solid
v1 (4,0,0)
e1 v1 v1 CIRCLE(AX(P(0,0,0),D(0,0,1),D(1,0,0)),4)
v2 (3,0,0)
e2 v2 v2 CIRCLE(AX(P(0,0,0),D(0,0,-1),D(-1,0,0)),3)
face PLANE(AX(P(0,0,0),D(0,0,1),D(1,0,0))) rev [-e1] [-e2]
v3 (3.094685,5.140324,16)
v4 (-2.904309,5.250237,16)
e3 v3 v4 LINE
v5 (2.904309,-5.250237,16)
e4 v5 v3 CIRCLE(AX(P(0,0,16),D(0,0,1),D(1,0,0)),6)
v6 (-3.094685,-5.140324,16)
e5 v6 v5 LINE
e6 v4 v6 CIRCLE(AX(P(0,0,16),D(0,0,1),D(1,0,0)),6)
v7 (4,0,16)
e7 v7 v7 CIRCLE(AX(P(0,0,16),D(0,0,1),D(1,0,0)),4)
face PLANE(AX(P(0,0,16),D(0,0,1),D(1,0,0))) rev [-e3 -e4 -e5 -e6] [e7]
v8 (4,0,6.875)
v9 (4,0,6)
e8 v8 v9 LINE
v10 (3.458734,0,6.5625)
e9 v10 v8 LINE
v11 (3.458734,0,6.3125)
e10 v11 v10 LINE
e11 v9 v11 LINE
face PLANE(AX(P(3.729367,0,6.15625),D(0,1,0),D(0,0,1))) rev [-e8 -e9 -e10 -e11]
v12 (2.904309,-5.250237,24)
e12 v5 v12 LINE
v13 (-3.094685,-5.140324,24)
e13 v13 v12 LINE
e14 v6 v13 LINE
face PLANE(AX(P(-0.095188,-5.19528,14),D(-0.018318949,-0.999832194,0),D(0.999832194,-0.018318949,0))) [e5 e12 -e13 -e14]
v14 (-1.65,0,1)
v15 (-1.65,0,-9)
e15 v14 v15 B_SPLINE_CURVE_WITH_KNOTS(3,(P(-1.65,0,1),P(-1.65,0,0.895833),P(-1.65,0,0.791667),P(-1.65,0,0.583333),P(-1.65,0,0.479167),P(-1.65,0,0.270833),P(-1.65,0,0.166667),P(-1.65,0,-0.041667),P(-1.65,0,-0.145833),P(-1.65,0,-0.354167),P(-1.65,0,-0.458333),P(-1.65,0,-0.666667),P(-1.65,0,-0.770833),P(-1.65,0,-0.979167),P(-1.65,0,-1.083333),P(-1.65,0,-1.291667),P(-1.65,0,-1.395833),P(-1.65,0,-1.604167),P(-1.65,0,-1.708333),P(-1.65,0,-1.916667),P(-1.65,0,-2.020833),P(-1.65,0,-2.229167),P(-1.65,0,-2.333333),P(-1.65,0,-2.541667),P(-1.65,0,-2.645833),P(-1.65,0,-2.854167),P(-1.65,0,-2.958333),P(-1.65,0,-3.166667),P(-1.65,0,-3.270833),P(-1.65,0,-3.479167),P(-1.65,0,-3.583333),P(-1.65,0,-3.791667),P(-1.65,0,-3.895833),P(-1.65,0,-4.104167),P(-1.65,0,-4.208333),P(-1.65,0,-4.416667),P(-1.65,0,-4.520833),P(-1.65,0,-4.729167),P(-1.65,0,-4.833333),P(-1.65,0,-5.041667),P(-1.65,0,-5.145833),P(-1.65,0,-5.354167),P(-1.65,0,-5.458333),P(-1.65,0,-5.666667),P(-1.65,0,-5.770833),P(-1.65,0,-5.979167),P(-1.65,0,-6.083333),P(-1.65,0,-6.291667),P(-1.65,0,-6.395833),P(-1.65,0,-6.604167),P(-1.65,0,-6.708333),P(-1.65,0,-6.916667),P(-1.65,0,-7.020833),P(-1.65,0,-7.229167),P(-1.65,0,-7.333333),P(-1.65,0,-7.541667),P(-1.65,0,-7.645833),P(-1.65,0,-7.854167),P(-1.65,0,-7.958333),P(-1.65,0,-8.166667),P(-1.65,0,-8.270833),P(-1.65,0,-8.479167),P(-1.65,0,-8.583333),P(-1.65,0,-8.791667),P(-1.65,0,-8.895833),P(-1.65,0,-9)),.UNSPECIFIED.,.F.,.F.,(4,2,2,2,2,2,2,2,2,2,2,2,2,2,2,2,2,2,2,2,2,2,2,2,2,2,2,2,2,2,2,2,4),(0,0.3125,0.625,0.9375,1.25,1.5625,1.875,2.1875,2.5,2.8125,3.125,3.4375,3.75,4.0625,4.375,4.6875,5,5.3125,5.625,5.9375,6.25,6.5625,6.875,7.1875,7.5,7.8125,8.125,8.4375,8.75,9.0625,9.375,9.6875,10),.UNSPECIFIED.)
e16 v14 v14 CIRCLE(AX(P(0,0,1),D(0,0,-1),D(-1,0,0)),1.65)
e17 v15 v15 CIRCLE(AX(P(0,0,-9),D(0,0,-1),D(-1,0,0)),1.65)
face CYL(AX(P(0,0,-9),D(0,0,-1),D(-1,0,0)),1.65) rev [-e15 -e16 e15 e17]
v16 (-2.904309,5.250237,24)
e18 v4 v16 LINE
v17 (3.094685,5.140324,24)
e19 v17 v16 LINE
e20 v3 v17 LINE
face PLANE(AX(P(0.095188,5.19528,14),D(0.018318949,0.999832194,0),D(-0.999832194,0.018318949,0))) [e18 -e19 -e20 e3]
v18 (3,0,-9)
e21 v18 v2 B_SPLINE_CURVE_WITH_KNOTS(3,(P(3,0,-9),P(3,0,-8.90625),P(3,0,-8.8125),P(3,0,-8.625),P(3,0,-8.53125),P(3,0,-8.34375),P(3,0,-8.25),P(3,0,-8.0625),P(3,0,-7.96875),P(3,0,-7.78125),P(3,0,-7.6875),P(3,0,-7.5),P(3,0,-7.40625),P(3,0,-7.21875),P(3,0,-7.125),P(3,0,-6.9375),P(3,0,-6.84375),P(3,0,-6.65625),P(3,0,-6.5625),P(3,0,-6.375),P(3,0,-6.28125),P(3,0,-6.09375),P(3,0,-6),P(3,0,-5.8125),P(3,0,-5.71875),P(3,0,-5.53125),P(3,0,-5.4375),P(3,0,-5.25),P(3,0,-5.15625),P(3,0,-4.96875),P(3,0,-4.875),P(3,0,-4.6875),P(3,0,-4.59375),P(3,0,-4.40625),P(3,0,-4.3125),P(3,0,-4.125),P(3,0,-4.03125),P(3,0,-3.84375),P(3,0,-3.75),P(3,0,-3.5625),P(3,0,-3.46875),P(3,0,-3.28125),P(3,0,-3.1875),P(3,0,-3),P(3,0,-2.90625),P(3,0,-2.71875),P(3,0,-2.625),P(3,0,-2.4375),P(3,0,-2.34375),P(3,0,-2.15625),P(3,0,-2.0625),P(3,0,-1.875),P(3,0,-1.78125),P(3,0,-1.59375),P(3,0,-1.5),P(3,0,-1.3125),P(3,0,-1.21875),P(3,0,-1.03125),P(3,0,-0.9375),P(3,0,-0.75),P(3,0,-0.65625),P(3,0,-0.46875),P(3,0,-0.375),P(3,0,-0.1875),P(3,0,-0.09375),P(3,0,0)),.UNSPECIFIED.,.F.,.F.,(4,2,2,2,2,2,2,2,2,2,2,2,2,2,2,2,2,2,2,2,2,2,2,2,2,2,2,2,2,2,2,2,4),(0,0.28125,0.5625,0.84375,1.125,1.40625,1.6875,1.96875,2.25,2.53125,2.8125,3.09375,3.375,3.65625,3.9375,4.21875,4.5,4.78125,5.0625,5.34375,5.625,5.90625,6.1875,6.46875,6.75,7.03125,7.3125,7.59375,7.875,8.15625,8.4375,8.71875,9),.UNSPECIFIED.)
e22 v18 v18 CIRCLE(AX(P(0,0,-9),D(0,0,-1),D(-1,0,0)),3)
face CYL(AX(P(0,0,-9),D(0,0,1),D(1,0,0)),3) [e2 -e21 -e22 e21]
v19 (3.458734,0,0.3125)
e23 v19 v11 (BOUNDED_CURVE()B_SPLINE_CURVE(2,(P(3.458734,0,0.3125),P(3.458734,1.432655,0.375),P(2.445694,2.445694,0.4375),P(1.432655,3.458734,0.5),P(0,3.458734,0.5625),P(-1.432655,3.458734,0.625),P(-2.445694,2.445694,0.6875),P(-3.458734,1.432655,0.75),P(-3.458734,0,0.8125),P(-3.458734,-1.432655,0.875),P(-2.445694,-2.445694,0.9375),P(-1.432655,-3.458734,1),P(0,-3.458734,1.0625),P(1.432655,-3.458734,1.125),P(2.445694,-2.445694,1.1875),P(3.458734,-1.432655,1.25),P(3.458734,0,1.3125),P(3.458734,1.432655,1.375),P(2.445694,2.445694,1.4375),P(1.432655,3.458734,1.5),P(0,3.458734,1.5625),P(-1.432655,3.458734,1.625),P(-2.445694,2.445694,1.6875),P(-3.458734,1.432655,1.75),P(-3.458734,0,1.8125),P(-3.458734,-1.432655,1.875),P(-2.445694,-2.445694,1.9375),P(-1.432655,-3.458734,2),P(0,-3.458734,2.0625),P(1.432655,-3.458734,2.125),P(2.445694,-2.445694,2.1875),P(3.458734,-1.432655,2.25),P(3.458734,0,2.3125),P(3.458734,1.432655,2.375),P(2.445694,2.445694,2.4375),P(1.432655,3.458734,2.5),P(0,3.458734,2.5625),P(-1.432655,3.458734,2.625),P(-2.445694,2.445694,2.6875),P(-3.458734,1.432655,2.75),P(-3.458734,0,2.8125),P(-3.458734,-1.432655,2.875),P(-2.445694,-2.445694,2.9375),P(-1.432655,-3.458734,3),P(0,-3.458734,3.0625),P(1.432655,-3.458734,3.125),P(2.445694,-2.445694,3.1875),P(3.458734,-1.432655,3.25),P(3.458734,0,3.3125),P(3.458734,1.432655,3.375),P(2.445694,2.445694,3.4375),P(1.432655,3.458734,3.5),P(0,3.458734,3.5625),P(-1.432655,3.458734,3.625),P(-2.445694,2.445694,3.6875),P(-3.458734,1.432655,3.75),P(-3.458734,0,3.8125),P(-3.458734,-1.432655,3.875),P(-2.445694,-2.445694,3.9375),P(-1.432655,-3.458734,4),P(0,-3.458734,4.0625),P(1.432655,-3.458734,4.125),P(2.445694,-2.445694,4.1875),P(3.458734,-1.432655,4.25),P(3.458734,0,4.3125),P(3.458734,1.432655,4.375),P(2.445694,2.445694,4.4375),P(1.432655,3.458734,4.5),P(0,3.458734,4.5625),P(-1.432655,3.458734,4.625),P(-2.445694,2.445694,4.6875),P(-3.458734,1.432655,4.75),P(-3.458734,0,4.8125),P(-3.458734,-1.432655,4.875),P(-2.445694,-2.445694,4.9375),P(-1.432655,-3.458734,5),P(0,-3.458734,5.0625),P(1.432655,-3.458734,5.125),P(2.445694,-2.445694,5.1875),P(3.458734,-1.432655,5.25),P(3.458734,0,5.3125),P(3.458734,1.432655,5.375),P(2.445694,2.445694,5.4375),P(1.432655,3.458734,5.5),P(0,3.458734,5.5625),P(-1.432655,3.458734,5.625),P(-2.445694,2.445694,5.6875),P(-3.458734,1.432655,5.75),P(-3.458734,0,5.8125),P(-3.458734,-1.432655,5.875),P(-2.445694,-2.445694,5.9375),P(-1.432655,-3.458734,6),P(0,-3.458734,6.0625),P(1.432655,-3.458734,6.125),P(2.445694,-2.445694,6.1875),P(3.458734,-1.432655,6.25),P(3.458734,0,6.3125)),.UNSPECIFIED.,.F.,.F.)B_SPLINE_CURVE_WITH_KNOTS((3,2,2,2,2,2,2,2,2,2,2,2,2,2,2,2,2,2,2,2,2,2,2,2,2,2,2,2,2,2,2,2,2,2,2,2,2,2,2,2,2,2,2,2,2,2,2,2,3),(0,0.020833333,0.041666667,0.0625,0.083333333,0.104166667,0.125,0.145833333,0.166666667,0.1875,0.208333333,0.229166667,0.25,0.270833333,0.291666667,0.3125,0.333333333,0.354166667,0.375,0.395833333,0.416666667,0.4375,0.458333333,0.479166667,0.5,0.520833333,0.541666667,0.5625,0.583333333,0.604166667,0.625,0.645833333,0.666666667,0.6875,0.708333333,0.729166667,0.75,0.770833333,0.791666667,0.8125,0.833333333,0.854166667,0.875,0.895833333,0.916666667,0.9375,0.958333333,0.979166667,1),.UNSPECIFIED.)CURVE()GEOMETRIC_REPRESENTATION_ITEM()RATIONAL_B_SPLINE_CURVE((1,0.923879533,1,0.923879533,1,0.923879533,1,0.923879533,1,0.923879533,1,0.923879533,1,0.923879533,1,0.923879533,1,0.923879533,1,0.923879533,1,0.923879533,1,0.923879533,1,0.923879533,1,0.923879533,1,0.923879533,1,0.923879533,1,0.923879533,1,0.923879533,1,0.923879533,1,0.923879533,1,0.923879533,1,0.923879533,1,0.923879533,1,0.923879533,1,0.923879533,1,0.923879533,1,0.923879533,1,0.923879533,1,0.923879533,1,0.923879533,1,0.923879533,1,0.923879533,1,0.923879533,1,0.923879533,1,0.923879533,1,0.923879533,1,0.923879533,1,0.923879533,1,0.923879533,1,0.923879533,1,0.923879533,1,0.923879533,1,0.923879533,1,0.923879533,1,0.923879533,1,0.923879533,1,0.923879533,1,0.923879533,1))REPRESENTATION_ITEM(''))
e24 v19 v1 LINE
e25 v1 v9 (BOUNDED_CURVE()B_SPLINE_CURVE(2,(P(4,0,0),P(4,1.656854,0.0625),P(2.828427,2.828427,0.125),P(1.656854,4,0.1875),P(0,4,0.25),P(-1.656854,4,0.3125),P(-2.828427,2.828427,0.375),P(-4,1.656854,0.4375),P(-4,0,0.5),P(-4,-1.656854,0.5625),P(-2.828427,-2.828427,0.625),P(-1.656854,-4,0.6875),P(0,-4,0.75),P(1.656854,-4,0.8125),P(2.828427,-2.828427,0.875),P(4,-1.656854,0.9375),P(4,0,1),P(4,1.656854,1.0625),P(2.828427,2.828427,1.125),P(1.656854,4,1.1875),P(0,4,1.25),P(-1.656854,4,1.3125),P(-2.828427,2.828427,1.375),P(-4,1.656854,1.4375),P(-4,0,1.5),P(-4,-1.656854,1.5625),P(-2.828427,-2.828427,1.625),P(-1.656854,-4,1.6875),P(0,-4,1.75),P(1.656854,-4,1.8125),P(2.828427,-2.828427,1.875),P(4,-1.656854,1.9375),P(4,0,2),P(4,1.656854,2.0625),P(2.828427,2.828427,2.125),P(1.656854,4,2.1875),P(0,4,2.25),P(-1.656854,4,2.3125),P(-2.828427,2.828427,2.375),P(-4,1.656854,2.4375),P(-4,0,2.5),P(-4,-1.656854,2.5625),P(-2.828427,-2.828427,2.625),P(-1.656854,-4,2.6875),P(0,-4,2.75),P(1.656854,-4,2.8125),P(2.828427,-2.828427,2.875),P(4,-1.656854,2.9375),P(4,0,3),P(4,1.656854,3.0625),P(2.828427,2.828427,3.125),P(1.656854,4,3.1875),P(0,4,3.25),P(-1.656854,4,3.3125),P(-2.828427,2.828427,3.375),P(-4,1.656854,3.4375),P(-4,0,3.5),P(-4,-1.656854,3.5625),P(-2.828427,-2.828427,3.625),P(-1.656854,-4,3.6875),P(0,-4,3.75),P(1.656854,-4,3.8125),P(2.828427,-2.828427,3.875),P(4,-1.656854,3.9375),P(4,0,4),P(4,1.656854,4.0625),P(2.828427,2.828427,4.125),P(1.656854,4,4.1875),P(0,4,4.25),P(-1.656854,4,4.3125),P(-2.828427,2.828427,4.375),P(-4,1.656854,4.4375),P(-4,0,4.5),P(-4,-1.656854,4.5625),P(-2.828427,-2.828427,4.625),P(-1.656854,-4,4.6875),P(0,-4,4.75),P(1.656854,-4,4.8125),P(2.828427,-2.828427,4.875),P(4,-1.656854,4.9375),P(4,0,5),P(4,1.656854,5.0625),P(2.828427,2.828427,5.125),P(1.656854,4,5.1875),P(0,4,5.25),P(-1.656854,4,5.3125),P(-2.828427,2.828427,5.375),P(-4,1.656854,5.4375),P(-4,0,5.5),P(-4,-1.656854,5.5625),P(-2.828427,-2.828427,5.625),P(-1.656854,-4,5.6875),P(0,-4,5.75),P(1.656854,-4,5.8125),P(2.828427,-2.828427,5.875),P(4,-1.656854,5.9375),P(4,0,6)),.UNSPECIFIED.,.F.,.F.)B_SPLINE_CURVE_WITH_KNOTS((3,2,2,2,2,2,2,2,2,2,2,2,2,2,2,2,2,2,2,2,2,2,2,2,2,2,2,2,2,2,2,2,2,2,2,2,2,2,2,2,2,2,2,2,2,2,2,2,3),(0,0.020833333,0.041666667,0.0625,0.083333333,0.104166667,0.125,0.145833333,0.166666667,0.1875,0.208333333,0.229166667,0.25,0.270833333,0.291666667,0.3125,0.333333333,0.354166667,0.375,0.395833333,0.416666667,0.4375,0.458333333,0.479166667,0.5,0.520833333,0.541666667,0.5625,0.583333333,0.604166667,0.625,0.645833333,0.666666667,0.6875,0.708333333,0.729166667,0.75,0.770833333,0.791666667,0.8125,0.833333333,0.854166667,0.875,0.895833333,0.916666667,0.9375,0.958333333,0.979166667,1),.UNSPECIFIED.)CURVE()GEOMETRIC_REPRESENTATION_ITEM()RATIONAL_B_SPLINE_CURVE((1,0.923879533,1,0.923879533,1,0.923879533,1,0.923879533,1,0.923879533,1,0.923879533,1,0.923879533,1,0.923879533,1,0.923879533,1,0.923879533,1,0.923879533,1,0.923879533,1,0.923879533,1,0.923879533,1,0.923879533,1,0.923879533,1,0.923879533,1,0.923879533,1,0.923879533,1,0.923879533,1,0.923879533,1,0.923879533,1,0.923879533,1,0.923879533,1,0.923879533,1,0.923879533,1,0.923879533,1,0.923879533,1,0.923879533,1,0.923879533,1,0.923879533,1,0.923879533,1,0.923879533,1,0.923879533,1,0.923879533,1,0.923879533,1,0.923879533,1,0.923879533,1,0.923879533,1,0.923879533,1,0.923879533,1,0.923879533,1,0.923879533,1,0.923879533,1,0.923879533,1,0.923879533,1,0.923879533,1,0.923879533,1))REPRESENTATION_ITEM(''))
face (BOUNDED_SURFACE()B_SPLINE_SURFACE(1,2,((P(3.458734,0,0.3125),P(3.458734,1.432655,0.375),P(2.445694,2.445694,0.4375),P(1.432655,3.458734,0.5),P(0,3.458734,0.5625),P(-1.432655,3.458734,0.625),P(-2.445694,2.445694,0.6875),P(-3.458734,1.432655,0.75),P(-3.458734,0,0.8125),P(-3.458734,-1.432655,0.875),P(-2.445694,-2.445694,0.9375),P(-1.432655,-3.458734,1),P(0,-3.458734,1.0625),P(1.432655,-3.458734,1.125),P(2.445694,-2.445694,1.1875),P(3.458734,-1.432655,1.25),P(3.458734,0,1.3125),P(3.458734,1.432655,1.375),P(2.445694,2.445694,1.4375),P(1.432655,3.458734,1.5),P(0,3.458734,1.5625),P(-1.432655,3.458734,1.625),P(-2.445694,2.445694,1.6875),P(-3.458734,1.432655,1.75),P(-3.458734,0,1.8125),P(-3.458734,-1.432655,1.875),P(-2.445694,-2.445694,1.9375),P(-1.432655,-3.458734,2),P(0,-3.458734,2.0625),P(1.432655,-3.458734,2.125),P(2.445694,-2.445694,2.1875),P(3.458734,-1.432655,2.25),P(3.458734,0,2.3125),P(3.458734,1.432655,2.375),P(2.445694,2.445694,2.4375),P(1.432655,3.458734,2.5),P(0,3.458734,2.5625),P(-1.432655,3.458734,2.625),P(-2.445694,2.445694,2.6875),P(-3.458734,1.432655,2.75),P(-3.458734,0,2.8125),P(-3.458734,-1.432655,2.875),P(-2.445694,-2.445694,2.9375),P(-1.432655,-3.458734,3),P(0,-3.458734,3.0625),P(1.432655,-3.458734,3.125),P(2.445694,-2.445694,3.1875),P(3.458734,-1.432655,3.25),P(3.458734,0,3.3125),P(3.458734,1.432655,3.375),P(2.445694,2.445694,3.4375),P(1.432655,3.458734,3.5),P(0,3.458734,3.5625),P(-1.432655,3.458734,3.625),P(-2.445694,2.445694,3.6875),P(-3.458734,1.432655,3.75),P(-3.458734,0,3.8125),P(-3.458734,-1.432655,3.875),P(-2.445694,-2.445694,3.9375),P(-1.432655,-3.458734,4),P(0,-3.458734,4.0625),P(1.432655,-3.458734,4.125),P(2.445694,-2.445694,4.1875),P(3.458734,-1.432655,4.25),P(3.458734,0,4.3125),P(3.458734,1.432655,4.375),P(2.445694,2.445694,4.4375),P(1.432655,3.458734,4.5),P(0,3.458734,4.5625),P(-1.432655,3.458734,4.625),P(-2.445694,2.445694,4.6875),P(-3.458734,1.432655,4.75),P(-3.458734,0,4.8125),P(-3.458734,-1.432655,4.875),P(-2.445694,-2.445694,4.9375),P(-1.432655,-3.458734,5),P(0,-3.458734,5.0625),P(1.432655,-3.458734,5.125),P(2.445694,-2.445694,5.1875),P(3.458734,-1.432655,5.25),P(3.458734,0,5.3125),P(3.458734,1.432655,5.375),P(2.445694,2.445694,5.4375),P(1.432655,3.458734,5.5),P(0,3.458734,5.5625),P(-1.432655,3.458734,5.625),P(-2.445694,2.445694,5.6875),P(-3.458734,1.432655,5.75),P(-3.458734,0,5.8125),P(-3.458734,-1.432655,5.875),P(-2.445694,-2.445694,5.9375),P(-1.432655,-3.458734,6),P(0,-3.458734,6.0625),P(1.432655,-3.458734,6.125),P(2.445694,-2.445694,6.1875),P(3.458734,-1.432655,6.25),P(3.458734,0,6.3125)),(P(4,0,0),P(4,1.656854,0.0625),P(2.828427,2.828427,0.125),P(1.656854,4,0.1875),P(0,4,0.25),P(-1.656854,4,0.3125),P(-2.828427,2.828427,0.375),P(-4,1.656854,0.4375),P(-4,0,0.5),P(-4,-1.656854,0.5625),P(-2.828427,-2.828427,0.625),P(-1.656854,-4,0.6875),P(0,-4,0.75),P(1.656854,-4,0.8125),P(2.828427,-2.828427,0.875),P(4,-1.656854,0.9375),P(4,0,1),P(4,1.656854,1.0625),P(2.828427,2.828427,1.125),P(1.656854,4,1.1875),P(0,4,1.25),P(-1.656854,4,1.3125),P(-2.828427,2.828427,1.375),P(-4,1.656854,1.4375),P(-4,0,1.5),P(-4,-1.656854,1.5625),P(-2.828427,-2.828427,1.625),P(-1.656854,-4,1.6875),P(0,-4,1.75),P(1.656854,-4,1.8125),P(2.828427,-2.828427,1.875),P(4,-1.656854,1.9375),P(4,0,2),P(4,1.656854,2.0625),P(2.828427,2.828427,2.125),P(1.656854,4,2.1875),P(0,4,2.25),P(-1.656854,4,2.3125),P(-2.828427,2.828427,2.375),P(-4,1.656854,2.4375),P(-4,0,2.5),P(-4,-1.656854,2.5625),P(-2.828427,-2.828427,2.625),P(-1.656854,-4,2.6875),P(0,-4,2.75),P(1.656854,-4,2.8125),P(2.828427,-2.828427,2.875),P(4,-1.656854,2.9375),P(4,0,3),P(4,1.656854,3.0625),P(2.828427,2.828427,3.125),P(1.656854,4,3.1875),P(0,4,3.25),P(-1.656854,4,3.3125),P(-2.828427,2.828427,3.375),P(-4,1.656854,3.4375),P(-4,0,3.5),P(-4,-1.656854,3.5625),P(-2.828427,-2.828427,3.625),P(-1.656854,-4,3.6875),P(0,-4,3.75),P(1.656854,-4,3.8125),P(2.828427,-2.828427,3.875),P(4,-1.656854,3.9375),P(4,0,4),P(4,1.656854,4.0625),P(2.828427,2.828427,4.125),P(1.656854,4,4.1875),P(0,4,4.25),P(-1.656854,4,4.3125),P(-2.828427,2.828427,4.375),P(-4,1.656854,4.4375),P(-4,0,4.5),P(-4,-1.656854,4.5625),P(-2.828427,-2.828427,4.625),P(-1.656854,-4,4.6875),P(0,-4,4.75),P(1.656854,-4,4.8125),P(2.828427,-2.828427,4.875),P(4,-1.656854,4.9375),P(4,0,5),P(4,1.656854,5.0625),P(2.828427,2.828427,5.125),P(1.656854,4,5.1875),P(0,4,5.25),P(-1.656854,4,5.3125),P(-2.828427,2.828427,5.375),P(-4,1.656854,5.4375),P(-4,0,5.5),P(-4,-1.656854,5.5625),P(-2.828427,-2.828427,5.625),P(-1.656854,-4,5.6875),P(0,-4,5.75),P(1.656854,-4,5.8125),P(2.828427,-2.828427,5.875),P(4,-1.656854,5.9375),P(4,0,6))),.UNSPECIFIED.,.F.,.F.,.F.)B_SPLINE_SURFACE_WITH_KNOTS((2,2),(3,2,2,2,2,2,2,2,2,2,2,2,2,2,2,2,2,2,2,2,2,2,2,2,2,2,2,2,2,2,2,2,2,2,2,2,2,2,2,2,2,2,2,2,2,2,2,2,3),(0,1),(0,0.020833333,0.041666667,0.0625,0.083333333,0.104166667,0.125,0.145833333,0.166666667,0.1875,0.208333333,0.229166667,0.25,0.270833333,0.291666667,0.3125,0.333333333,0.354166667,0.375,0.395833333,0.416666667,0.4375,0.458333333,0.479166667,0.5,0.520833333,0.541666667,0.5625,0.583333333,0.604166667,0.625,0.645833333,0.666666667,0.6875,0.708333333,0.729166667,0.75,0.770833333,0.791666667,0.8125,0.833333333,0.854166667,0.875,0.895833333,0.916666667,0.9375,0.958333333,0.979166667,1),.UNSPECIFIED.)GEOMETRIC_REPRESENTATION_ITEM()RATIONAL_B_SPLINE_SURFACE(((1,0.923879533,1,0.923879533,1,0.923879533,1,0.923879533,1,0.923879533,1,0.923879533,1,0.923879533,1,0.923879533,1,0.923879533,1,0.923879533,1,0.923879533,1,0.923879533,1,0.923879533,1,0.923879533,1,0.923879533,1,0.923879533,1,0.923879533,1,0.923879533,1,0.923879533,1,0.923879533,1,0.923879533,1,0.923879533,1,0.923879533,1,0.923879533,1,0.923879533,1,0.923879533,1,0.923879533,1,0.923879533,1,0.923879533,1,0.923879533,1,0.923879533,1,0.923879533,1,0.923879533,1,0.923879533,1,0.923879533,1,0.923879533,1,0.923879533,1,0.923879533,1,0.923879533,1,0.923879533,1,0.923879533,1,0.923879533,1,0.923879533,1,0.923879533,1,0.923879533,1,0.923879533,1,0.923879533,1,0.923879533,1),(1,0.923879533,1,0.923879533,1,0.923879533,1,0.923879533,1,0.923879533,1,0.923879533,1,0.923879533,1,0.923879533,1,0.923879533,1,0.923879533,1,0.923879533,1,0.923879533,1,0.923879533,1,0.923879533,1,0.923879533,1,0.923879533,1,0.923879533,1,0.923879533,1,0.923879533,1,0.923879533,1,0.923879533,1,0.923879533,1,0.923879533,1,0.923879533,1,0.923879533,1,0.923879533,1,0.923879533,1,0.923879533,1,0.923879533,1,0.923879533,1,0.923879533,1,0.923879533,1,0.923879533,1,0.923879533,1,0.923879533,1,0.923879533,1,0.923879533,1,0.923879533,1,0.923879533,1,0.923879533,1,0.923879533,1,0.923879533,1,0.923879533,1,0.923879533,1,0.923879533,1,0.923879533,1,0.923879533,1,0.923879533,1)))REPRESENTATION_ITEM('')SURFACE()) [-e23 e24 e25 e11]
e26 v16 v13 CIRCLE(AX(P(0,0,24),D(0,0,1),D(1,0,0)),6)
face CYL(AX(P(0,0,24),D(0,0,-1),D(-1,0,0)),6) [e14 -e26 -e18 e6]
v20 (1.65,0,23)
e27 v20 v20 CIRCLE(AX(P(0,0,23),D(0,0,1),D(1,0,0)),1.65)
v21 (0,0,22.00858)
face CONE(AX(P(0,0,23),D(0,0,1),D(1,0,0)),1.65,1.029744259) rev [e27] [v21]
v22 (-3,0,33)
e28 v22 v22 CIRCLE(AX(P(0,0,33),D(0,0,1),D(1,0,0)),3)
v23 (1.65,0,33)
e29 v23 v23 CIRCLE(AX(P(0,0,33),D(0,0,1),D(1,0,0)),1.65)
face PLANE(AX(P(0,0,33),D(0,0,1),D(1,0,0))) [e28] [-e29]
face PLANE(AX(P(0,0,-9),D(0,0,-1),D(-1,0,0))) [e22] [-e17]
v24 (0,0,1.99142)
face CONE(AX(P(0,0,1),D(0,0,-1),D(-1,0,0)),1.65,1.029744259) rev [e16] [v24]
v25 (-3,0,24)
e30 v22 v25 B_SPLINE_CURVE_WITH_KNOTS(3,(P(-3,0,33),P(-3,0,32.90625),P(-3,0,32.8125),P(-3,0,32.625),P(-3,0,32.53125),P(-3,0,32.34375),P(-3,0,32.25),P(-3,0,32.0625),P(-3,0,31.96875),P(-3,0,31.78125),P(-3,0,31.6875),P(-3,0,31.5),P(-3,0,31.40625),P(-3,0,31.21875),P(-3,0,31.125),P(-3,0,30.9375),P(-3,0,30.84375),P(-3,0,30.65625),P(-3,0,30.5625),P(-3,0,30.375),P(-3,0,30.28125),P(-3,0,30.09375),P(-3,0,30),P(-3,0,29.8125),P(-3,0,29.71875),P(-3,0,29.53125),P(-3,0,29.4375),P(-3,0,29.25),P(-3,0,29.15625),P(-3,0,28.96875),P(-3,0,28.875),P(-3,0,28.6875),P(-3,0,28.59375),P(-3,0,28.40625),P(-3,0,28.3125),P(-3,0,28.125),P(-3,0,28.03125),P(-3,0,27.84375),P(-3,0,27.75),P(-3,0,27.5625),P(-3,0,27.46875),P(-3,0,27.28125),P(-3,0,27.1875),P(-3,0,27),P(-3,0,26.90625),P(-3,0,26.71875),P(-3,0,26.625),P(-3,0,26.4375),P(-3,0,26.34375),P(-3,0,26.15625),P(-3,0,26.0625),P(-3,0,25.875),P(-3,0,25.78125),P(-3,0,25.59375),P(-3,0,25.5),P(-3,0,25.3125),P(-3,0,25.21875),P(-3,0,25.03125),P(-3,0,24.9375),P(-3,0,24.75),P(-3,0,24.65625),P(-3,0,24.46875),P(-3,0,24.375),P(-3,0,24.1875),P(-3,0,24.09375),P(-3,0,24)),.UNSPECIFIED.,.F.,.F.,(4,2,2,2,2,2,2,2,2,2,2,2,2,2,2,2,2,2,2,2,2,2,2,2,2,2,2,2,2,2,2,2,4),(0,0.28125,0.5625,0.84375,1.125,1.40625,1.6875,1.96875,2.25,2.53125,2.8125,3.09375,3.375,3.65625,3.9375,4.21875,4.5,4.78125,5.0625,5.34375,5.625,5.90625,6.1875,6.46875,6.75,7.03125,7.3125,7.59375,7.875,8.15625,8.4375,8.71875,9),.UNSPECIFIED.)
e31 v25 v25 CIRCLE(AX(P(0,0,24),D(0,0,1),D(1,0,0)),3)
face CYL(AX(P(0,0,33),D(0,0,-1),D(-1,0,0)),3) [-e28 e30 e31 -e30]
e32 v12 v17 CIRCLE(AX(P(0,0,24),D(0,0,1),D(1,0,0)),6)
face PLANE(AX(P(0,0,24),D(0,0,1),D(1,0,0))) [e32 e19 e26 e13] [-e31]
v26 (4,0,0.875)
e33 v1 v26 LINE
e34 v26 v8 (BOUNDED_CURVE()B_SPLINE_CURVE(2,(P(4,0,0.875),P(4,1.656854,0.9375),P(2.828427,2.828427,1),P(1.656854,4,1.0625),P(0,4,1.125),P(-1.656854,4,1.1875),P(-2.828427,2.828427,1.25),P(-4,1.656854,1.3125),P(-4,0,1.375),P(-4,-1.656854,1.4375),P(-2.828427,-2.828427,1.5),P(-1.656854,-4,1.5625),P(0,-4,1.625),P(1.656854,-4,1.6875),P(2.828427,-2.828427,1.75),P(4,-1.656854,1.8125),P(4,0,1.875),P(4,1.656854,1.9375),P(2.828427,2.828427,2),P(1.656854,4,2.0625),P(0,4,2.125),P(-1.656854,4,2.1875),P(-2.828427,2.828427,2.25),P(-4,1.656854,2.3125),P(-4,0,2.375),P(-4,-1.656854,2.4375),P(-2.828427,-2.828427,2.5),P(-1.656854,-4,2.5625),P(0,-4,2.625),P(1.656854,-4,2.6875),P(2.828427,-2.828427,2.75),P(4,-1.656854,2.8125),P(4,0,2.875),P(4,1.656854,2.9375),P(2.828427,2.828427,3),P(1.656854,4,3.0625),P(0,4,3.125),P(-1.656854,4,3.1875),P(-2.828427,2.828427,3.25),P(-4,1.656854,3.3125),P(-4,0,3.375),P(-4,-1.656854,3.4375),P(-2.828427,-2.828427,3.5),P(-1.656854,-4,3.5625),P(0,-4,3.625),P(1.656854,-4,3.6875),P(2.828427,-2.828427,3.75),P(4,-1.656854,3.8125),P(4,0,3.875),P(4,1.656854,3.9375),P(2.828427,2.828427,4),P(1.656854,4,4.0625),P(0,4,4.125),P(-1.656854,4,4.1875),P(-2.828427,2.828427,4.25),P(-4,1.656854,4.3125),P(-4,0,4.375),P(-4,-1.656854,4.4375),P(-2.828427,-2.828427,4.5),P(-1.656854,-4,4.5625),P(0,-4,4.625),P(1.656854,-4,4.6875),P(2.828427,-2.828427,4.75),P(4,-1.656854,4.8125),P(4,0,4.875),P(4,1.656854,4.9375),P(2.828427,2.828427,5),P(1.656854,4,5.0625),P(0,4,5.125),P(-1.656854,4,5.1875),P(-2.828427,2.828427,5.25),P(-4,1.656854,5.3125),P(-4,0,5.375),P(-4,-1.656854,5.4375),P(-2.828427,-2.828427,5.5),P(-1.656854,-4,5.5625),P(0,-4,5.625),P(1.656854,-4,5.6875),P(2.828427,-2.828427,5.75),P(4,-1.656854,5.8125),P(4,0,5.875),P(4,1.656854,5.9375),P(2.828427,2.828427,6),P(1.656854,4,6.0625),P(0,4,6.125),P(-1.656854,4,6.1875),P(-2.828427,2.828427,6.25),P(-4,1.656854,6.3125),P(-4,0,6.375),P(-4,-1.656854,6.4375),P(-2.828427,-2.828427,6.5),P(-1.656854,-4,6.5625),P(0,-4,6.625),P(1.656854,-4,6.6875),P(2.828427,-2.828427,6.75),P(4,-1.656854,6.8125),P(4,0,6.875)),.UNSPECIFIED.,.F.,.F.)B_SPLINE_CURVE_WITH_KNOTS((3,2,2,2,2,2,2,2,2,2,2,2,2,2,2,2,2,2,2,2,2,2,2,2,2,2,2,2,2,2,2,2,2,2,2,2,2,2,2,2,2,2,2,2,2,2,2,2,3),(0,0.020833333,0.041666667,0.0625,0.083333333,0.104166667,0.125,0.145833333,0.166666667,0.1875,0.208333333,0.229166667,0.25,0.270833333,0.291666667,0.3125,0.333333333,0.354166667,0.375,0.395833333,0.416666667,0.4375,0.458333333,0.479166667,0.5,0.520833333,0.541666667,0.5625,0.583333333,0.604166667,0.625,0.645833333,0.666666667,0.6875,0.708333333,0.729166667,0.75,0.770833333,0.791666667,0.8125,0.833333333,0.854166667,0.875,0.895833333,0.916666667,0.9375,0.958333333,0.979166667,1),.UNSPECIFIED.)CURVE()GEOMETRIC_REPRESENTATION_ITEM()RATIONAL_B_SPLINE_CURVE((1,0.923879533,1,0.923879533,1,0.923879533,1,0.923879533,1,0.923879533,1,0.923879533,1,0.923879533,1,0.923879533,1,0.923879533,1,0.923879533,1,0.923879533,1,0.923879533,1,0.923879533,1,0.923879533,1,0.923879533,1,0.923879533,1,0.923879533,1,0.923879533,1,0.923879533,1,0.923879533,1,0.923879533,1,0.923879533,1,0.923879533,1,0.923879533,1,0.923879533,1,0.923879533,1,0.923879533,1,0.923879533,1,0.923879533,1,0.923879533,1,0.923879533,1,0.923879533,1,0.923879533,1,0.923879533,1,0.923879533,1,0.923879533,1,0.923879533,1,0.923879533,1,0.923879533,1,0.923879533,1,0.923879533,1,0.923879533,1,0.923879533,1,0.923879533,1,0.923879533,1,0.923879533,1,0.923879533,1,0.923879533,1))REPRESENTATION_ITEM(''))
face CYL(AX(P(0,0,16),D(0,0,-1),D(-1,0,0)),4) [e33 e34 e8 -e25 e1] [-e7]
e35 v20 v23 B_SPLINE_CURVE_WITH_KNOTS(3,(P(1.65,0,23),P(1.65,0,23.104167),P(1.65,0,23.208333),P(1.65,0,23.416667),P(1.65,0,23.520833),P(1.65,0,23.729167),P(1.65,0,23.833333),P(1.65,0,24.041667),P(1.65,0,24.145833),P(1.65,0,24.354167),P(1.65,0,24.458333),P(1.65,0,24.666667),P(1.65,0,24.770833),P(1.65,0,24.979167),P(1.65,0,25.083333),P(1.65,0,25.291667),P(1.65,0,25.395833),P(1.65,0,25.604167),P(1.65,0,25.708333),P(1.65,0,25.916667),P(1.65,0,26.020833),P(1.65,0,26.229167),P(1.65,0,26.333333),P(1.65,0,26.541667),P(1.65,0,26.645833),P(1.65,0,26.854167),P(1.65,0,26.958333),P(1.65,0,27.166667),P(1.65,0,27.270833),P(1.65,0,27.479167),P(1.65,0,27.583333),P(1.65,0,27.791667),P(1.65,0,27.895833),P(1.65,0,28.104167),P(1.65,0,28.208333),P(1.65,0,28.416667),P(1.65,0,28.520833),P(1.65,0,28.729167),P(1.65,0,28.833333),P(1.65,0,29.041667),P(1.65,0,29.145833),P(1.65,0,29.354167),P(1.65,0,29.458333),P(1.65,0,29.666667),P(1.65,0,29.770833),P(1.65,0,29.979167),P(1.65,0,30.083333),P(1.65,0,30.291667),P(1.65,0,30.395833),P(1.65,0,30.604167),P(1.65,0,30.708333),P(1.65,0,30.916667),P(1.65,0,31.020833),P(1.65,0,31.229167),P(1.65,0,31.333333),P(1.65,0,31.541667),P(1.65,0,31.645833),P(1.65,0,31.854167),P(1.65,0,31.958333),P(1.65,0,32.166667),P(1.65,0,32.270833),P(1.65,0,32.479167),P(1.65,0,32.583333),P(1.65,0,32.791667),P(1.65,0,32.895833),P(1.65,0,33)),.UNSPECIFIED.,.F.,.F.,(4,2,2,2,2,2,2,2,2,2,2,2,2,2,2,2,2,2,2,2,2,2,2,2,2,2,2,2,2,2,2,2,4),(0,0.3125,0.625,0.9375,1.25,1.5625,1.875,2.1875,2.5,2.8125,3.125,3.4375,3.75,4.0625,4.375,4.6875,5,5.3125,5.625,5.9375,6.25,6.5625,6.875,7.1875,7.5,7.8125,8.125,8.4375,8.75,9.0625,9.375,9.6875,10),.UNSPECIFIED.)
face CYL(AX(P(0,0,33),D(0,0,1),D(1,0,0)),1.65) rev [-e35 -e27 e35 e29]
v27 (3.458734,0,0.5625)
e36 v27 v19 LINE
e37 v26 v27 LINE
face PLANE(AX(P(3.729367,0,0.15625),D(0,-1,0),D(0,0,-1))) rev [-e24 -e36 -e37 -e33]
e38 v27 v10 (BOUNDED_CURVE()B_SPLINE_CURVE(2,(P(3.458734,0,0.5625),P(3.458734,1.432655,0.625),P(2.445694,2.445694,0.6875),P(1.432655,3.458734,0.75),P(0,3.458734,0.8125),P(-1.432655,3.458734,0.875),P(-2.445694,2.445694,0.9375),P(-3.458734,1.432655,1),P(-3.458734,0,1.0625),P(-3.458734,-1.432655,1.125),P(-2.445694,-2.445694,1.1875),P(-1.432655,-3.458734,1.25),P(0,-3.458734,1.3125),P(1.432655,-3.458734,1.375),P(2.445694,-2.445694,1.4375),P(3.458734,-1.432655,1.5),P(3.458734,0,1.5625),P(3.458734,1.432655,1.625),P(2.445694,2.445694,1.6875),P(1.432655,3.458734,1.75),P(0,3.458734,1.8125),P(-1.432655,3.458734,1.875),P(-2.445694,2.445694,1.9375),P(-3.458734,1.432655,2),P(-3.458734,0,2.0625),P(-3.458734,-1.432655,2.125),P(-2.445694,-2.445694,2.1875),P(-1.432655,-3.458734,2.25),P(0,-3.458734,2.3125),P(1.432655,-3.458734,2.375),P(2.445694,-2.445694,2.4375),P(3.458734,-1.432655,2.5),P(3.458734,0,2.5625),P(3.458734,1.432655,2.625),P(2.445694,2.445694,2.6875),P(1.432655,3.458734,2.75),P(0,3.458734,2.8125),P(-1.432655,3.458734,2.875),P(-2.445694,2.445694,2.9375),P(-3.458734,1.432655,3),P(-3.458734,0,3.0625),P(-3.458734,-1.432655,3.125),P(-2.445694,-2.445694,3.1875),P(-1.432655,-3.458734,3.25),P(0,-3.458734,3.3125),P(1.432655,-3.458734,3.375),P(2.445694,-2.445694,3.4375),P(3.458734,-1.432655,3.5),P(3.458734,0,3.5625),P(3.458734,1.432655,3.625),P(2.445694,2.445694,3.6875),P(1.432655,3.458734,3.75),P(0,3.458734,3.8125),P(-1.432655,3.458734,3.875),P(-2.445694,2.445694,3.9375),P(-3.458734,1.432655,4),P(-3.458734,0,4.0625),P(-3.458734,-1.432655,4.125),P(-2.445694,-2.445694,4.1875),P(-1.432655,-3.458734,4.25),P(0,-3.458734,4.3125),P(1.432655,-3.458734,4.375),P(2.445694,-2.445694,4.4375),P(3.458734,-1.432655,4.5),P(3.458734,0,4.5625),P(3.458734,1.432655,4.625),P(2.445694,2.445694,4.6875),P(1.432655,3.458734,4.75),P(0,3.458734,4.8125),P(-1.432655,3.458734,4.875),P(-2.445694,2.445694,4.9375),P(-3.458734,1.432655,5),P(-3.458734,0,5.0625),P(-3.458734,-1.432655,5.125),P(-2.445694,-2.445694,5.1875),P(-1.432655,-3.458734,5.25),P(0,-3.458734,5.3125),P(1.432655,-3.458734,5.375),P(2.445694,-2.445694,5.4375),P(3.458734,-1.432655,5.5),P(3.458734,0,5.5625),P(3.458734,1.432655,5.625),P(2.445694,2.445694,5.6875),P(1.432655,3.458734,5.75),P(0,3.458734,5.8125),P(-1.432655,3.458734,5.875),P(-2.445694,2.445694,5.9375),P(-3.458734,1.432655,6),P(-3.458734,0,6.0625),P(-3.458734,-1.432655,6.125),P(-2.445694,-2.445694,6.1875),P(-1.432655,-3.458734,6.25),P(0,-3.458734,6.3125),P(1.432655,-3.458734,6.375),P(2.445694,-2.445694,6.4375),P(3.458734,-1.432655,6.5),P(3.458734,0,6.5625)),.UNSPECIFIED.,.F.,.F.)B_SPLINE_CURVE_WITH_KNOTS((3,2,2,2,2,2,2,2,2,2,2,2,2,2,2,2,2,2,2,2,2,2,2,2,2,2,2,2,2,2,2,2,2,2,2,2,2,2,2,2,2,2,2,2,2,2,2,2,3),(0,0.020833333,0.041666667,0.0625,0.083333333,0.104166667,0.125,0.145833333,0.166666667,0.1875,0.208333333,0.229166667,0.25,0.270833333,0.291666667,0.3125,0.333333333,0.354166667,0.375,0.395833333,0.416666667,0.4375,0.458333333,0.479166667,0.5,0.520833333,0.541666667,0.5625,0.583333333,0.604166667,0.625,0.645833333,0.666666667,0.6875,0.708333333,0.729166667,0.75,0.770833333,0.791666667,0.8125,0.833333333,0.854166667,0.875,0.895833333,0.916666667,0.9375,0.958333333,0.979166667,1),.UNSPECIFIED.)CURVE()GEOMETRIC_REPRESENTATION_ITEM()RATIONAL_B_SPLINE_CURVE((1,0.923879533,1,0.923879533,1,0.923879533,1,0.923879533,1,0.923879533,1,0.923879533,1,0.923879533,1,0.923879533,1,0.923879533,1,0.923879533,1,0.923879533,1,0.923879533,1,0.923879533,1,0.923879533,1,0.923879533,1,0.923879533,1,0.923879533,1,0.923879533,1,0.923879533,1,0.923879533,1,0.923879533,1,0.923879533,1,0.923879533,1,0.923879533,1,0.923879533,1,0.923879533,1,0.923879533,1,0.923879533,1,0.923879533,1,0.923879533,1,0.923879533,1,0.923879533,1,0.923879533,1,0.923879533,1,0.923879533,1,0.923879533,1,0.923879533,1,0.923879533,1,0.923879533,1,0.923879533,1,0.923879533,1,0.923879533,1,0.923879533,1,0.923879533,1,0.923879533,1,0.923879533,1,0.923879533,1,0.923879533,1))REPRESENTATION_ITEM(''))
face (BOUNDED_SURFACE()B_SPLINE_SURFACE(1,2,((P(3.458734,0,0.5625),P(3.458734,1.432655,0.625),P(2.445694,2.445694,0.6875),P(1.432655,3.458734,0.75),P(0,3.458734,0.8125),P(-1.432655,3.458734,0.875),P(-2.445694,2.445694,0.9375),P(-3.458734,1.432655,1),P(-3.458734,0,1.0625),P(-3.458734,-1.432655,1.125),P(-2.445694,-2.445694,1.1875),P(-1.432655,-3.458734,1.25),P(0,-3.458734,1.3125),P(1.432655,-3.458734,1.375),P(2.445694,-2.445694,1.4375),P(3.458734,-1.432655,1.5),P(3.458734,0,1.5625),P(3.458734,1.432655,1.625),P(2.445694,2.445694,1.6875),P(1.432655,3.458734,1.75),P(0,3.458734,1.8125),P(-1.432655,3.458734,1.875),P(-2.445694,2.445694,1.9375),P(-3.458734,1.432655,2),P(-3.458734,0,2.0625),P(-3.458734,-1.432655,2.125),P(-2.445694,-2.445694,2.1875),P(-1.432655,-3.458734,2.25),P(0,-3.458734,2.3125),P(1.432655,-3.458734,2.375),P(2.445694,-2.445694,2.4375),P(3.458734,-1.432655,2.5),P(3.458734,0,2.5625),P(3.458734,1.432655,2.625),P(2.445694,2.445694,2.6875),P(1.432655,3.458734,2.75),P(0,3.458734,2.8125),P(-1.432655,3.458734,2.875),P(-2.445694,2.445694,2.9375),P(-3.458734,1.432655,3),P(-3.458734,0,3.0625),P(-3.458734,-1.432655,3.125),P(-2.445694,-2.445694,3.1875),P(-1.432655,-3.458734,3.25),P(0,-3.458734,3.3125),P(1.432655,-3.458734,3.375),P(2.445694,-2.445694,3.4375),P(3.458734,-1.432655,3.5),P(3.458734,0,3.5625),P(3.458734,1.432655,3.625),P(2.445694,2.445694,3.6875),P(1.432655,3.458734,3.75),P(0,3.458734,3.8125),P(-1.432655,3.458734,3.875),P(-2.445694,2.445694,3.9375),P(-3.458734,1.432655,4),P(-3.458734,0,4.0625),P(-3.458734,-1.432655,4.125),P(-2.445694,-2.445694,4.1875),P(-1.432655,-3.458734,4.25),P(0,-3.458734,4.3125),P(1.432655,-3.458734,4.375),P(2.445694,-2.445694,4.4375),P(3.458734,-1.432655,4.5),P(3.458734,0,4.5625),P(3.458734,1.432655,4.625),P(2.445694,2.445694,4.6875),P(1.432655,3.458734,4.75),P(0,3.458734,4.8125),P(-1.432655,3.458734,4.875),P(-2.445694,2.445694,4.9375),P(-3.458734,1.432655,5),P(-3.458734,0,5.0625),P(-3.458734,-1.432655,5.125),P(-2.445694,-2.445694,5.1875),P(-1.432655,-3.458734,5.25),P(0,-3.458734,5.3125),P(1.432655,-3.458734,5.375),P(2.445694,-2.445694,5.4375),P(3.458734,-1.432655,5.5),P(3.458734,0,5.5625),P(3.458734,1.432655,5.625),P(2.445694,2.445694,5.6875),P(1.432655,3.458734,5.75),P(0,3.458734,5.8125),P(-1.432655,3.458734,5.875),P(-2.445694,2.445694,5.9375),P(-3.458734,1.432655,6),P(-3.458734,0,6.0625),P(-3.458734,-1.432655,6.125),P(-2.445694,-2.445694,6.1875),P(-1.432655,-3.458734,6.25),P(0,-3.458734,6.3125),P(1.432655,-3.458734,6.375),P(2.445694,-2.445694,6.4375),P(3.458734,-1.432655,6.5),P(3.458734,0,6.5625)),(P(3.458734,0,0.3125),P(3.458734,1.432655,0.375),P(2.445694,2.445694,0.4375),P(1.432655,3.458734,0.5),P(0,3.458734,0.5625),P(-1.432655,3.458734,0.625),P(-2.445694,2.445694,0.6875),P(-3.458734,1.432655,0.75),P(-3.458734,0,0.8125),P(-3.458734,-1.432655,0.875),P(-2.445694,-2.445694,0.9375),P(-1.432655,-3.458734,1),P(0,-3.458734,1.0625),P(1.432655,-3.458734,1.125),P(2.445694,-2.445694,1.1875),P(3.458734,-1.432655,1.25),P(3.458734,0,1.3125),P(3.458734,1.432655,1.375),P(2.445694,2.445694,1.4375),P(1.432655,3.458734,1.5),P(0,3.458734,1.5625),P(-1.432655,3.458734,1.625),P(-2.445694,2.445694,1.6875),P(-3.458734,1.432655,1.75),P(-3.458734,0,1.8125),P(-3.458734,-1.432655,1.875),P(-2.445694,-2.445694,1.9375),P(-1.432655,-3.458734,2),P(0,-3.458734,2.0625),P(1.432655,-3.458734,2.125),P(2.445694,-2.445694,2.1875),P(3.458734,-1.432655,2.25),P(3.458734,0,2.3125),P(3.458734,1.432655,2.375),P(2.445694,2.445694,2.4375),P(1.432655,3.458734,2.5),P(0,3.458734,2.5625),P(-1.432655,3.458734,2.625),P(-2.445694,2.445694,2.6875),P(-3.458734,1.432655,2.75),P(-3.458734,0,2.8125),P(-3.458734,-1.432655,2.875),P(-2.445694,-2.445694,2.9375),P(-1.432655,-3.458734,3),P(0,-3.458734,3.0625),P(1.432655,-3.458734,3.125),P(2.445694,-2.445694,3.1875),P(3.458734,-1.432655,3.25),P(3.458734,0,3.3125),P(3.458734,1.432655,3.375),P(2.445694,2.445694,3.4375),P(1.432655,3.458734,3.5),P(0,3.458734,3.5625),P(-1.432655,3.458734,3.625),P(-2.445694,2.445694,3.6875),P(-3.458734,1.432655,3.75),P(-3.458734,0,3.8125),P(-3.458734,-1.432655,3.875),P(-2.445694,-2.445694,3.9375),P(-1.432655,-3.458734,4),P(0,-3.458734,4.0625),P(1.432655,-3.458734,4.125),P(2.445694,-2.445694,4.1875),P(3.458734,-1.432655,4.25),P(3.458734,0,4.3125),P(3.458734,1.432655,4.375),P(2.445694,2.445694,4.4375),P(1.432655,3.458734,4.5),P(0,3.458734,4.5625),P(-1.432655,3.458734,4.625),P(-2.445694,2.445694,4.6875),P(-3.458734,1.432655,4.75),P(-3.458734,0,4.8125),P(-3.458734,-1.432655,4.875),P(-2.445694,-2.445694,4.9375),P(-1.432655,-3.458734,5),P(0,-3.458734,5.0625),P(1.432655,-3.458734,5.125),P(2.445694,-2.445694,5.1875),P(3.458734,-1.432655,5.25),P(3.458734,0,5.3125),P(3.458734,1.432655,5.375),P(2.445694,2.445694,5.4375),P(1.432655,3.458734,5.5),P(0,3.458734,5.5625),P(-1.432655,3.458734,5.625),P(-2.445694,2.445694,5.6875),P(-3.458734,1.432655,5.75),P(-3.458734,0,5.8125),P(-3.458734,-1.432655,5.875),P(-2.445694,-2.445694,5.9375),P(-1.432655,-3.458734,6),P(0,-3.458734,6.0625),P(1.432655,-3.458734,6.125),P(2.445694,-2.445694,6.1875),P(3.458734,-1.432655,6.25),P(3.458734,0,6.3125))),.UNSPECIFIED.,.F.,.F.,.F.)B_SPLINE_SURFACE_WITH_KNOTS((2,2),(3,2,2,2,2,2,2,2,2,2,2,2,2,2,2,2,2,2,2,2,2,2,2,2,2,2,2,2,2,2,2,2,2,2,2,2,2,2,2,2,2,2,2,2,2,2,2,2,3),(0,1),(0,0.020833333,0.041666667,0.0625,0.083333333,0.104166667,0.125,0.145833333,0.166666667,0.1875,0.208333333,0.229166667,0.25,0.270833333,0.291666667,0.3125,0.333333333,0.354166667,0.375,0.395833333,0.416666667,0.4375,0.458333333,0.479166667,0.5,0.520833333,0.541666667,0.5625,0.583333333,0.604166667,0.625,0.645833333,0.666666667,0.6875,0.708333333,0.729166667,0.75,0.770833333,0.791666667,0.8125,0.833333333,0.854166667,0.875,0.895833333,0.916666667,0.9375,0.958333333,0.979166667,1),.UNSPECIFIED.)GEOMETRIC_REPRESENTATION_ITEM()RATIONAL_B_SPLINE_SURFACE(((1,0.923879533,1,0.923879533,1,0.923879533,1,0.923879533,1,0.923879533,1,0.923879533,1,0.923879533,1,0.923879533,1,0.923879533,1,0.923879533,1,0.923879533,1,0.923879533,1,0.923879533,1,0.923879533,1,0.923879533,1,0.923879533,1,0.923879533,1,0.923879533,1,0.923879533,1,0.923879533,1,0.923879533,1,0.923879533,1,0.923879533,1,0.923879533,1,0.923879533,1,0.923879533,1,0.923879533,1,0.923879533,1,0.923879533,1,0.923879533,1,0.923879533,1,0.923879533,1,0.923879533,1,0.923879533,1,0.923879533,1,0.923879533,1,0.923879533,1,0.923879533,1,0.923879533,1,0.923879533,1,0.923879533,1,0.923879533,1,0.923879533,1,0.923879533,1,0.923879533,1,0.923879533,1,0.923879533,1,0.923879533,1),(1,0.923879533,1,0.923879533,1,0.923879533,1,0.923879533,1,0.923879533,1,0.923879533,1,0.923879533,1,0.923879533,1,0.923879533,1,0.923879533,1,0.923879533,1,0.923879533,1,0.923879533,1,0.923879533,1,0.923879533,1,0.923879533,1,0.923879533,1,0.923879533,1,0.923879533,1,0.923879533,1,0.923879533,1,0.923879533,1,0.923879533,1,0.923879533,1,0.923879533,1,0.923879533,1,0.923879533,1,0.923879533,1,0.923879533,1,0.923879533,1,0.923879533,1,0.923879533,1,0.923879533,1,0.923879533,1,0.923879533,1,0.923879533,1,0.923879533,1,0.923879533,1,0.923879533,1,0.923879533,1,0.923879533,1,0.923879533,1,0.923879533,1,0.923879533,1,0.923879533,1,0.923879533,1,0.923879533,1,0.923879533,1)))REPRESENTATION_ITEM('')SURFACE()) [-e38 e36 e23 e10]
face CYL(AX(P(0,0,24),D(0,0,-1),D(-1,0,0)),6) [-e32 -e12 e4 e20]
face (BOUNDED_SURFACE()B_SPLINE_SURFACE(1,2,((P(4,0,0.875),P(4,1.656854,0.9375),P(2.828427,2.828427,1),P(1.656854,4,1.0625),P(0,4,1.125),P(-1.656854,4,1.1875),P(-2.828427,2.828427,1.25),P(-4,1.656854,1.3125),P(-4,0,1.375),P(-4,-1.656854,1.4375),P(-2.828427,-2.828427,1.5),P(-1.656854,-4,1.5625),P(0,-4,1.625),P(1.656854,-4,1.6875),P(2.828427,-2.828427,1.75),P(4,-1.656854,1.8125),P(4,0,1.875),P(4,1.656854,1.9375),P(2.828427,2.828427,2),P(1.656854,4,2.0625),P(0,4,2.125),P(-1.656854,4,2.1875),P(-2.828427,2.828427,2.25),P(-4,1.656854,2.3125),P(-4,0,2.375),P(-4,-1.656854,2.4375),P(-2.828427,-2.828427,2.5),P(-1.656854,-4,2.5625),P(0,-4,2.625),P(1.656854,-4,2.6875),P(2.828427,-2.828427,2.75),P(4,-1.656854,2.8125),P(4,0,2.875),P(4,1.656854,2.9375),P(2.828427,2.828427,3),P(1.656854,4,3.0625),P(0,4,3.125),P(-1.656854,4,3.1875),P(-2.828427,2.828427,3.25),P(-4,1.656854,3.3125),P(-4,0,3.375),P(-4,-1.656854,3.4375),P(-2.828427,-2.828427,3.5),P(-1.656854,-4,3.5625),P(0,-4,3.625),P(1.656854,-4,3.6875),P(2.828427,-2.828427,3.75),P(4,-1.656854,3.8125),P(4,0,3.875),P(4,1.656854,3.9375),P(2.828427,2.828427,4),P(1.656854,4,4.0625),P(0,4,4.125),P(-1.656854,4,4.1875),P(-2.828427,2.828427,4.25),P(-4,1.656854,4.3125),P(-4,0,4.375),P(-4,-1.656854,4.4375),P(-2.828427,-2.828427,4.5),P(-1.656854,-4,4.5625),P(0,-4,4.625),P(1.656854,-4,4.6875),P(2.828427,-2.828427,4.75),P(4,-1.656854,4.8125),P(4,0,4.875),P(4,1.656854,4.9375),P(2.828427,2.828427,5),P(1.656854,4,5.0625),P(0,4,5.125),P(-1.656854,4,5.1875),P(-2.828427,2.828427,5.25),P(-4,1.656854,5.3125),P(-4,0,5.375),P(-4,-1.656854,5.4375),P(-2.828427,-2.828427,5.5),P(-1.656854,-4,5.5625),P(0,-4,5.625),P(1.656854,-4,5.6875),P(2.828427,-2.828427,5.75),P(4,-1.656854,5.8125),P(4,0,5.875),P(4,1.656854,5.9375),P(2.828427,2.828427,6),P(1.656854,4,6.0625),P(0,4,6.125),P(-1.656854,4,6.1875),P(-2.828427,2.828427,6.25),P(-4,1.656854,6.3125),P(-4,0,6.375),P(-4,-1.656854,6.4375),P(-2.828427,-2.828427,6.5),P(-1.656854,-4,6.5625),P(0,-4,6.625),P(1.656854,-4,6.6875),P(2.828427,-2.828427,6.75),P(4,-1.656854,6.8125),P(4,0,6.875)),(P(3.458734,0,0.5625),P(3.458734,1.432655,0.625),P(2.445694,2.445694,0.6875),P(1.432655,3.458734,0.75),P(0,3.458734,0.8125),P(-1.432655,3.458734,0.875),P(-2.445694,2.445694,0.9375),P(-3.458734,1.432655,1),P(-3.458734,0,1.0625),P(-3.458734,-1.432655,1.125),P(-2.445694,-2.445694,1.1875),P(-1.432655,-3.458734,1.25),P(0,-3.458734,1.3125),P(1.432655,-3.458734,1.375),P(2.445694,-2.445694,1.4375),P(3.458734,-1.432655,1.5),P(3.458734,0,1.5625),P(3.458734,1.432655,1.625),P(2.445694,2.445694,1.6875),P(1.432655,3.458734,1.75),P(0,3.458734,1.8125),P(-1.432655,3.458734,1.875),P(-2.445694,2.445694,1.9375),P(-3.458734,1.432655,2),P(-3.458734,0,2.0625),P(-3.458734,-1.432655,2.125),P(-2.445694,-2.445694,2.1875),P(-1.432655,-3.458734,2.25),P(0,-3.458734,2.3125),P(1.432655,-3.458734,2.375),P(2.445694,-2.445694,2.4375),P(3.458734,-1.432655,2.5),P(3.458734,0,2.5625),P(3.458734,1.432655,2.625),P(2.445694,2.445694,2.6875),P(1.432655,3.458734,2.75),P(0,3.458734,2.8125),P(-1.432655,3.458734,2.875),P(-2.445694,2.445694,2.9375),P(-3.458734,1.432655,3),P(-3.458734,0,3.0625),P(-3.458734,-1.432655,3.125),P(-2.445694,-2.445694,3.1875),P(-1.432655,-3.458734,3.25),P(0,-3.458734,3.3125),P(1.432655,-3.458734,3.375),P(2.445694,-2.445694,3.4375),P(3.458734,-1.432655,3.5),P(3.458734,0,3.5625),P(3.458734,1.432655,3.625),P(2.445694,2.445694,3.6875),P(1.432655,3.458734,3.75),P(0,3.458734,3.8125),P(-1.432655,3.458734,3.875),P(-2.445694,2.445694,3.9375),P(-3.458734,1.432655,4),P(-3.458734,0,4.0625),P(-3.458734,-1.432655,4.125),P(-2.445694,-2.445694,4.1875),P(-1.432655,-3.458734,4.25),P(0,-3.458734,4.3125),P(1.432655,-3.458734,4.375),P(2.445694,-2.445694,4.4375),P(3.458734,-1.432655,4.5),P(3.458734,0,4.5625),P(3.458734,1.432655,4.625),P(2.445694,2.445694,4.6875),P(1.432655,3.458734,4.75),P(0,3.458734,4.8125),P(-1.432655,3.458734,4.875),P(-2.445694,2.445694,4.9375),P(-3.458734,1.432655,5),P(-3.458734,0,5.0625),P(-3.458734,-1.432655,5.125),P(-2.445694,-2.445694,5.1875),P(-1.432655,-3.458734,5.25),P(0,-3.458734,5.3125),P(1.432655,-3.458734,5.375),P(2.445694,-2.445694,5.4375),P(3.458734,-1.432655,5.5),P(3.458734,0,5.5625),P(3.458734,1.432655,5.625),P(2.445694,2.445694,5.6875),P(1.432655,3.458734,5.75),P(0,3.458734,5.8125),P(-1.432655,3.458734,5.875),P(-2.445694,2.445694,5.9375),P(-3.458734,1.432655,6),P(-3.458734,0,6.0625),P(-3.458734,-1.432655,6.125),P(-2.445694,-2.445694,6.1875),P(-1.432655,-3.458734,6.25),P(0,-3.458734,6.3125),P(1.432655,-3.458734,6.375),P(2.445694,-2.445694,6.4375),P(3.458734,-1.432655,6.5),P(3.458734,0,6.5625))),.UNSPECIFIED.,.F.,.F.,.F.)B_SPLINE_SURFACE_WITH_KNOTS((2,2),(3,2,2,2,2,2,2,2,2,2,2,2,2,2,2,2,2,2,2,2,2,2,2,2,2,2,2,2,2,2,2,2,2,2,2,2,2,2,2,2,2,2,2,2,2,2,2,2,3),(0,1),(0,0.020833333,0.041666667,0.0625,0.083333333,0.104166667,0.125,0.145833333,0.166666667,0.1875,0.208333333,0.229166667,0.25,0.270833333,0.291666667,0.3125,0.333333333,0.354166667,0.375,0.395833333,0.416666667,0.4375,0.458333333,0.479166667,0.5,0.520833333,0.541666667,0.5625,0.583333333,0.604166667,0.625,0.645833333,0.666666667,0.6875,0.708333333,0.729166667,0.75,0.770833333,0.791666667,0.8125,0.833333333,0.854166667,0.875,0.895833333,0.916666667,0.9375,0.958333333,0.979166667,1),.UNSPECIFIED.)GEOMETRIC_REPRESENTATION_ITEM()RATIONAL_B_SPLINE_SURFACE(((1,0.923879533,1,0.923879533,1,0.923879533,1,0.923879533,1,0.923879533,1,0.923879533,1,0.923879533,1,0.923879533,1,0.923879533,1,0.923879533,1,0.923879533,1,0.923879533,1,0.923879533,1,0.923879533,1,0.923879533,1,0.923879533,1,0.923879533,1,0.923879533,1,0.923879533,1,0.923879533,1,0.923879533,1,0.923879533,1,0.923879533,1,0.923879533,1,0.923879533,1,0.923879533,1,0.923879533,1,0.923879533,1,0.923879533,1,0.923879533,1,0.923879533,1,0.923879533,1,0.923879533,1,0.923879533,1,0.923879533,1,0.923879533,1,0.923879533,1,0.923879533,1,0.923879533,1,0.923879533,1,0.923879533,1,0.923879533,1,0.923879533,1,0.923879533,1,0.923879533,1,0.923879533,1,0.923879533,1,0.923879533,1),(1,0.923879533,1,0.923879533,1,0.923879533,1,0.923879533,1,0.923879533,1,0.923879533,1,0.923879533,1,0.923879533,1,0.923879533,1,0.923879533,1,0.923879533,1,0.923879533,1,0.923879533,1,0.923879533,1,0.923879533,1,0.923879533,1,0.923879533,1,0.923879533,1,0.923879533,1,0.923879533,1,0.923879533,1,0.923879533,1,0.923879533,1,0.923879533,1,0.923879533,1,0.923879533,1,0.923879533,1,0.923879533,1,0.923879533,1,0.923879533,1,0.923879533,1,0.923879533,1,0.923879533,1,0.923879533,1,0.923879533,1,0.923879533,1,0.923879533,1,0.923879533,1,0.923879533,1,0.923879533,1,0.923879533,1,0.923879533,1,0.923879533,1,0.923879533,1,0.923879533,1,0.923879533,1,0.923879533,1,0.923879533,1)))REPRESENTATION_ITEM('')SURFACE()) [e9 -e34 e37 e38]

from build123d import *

# Parameters (mm, degrees)
SKETCH1_R                 = 4
BOSS_EXTRUDE1_DEPTH       = 16
SKETCH2_R                 = 6
BOSS_EXTRUDE2_DEPTH       = 8
SKETCH3_R                 = 3
BOSS_EXTRUDE3_DEPTH       = 9
BOSS_EXTRUDE4_START       = 9
SKETCH8_R                 = 3
BOSS_EXTRUDE4_DEPTH       = 9
M4X0_7_TAPPED_HOLE2_D     = 3.3
M4X0_7_TAPPED_HOLE2_DEPTH = 10
M4X0_7_TAPPED_HOLE2_TIP   = 0.991420021
THREAD1_PITCH             = 1
M4X0_7_TAPPED_HOLE3_D     = 3.3
M4X0_7_TAPPED_HOLE3_DEPTH = 10
M4X0_7_TAPPED_HOLE3_TIP   = 0.991420021
CUT_EXTRUDE1_START        = -10
CUT_EXTRUDE1_DEPTH        = 10


with BuildPart() as part:
    # Sketch1 → Boss-Extrude1 (new body)
    with BuildSketch(Plane.XY):
        Circle(SKETCH1_R)
    extrude(amount=BOSS_EXTRUDE1_DEPTH)

    # Sketch2 → Boss-Extrude2 (add)
    with BuildSketch(Plane.XY.offset(16)):
        Circle(SKETCH2_R)
    extrude(amount=BOSS_EXTRUDE2_DEPTH)

    # Sketch3 → Boss-Extrude3 (add)
    with BuildSketch(Plane(origin=(0, 0, 0), x_dir=(-1, 0, 0), z_dir=(0, 0, -1))):
        Circle(SKETCH3_R)
    extrude(amount=BOSS_EXTRUDE3_DEPTH)

    # Sketch8 → Boss-Extrude4 (add)
    with BuildSketch(Plane.XY.offset(24).offset(BOSS_EXTRUDE4_START)):
        with Locations(Location((0, 0, 0), (0, 0, 180))):
            Circle(SKETCH8_R)
    extrude(amount=-BOSS_EXTRUDE4_DEPTH)

    # M4x0.7 Tapped Hole2
    with Locations(Plane.XY.offset(33)):
        with Locations((0, 0)):
            Hole(M4X0_7_TAPPED_HOLE2_D / 2, depth=M4X0_7_TAPPED_HOLE2_DEPTH)
            with Locations((0, 0, -(M4X0_7_TAPPED_HOLE2_DEPTH + M4X0_7_TAPPED_HOLE2_TIP / 2))):  # 118° drill point
                Cone(0, M4X0_7_TAPPED_HOLE2_D / 2, M4X0_7_TAPPED_HOLE2_TIP, mode=Mode.SUBTRACT)

    # Thread1: the profile of Thread Profile2 profile screwed along a right-hand helix of 6 turns, 8 arcs to a turn; built about Z, then put on its axis
    thread1_z = Axis((0, 0, 0), (0, 0, 1))
    thread1_corners = [(4.0003, 0, -0.000173205), (4.0003, 0, 0.875173202), (3.458734125, 0, 0.562499999), (3.458734125, 0, 0.312499999)]
    with BuildLine(mode=Mode.PRIVATE) as thread1_profile:
        Line(thread1_corners[0], thread1_corners[1])
        Line(thread1_corners[1], thread1_corners[2])
        Line(thread1_corners[2], thread1_corners[3])
        Line(thread1_corners[3], thread1_corners[0])
    thread1_cap = Face(thread1_profile.wire())
    thread1_turn_angles = [0, 22.5, 45, 67.5, 90, 112.5, 135, 157.5, 180, 202.5, 225, 247.5, 270, 292.5, 315, 337.5, 360]
    thread1_turn_weights = [1, 0.9238795325112867, 1, 0.9238795325112867, 1, 0.9238795325112867, 1, 0.9238795325112867, 1, 0.9238795325112867, 1, 0.9238795325112867, 1, 0.9238795325112867, 1, 0.9238795325112867, 1]
    thread1_turn_rails = [Edge.make_bspline([Vector(p[0], p[1], 0).rotate(thread1_z, thread1_turn_angles[k]) / thread1_turn_weights[k] + Vector(0, 0, p[2] + THREAD1_PITCH * thread1_turn_angles[k] / 360) for k in range(17)], [0, 0, 0, 1, 1, 2, 2, 3, 3, 4, 4, 5, 5, 6, 6, 7, 7, 8, 8, 8], 2, thread1_turn_weights) for p in thread1_corners]
    thread1_turn_sides = [Face.make_surface_from_curves(thread1_turn_rails[p[0]], thread1_turn_rails[p[1]]) for p in [(0, 1), (1, 2), (2, 3), (3, 0)]]
    thread1 = Plane(origin=(0, 0, 0), x_dir=(1, 0, 0), z_dir=(0, 0, 1)) * Solid(Shell([*[p.moved(Location((0, 0, THREAD1_PITCH * i))) for i in range(6) for p in thread1_turn_sides], thread1_cap, thread1_cap.rotate(thread1_z, 2160).moved(Location((0, 0, THREAD1_PITCH * 2160 / 360)))]))
    add(thread1, mode=Mode.SUBTRACT)

    # M4x0.7 Tapped Hole3
    with Locations(Plane(origin=(0, 0, -9), x_dir=(-1, 0, 0), z_dir=(0, 0, -1))):
        with Locations((0, 0)):
            Hole(M4X0_7_TAPPED_HOLE3_D / 2, depth=M4X0_7_TAPPED_HOLE3_DEPTH)
            with Locations((0, 0, -(M4X0_7_TAPPED_HOLE3_DEPTH + M4X0_7_TAPPED_HOLE3_TIP / 2))):  # 118° drill point
                Cone(0, M4X0_7_TAPPED_HOLE3_D / 2, M4X0_7_TAPPED_HOLE3_TIP, mode=Mode.SUBTRACT)

    # Sketch36 → Cut-Extrude1 (cut)
    with BuildSketch(Plane.XY.offset(24).offset(CUT_EXTRUDE1_START)):
        with BuildLine():
            Line((-2.90430853, 5.250237325), (3.094684634, 5.140323629))
            ThreePointArc((3.094684634, 5.140323629), (0.109913695, 5.998993164), (-2.90430853, 5.250237325))
        make_face()
        with BuildLine():
            ThreePointArc((-3.094684634, -5.140323629), (-0.109913695, -5.998993164), (2.90430853, -5.250237325))
            Line((2.90430853, -5.250237325), (-3.094684634, -5.140323629))
        make_face()
    extrude(amount=CUT_EXTRUDE1_DEPTH, mode=Mode.SUBTRACT)


solid = part.part
